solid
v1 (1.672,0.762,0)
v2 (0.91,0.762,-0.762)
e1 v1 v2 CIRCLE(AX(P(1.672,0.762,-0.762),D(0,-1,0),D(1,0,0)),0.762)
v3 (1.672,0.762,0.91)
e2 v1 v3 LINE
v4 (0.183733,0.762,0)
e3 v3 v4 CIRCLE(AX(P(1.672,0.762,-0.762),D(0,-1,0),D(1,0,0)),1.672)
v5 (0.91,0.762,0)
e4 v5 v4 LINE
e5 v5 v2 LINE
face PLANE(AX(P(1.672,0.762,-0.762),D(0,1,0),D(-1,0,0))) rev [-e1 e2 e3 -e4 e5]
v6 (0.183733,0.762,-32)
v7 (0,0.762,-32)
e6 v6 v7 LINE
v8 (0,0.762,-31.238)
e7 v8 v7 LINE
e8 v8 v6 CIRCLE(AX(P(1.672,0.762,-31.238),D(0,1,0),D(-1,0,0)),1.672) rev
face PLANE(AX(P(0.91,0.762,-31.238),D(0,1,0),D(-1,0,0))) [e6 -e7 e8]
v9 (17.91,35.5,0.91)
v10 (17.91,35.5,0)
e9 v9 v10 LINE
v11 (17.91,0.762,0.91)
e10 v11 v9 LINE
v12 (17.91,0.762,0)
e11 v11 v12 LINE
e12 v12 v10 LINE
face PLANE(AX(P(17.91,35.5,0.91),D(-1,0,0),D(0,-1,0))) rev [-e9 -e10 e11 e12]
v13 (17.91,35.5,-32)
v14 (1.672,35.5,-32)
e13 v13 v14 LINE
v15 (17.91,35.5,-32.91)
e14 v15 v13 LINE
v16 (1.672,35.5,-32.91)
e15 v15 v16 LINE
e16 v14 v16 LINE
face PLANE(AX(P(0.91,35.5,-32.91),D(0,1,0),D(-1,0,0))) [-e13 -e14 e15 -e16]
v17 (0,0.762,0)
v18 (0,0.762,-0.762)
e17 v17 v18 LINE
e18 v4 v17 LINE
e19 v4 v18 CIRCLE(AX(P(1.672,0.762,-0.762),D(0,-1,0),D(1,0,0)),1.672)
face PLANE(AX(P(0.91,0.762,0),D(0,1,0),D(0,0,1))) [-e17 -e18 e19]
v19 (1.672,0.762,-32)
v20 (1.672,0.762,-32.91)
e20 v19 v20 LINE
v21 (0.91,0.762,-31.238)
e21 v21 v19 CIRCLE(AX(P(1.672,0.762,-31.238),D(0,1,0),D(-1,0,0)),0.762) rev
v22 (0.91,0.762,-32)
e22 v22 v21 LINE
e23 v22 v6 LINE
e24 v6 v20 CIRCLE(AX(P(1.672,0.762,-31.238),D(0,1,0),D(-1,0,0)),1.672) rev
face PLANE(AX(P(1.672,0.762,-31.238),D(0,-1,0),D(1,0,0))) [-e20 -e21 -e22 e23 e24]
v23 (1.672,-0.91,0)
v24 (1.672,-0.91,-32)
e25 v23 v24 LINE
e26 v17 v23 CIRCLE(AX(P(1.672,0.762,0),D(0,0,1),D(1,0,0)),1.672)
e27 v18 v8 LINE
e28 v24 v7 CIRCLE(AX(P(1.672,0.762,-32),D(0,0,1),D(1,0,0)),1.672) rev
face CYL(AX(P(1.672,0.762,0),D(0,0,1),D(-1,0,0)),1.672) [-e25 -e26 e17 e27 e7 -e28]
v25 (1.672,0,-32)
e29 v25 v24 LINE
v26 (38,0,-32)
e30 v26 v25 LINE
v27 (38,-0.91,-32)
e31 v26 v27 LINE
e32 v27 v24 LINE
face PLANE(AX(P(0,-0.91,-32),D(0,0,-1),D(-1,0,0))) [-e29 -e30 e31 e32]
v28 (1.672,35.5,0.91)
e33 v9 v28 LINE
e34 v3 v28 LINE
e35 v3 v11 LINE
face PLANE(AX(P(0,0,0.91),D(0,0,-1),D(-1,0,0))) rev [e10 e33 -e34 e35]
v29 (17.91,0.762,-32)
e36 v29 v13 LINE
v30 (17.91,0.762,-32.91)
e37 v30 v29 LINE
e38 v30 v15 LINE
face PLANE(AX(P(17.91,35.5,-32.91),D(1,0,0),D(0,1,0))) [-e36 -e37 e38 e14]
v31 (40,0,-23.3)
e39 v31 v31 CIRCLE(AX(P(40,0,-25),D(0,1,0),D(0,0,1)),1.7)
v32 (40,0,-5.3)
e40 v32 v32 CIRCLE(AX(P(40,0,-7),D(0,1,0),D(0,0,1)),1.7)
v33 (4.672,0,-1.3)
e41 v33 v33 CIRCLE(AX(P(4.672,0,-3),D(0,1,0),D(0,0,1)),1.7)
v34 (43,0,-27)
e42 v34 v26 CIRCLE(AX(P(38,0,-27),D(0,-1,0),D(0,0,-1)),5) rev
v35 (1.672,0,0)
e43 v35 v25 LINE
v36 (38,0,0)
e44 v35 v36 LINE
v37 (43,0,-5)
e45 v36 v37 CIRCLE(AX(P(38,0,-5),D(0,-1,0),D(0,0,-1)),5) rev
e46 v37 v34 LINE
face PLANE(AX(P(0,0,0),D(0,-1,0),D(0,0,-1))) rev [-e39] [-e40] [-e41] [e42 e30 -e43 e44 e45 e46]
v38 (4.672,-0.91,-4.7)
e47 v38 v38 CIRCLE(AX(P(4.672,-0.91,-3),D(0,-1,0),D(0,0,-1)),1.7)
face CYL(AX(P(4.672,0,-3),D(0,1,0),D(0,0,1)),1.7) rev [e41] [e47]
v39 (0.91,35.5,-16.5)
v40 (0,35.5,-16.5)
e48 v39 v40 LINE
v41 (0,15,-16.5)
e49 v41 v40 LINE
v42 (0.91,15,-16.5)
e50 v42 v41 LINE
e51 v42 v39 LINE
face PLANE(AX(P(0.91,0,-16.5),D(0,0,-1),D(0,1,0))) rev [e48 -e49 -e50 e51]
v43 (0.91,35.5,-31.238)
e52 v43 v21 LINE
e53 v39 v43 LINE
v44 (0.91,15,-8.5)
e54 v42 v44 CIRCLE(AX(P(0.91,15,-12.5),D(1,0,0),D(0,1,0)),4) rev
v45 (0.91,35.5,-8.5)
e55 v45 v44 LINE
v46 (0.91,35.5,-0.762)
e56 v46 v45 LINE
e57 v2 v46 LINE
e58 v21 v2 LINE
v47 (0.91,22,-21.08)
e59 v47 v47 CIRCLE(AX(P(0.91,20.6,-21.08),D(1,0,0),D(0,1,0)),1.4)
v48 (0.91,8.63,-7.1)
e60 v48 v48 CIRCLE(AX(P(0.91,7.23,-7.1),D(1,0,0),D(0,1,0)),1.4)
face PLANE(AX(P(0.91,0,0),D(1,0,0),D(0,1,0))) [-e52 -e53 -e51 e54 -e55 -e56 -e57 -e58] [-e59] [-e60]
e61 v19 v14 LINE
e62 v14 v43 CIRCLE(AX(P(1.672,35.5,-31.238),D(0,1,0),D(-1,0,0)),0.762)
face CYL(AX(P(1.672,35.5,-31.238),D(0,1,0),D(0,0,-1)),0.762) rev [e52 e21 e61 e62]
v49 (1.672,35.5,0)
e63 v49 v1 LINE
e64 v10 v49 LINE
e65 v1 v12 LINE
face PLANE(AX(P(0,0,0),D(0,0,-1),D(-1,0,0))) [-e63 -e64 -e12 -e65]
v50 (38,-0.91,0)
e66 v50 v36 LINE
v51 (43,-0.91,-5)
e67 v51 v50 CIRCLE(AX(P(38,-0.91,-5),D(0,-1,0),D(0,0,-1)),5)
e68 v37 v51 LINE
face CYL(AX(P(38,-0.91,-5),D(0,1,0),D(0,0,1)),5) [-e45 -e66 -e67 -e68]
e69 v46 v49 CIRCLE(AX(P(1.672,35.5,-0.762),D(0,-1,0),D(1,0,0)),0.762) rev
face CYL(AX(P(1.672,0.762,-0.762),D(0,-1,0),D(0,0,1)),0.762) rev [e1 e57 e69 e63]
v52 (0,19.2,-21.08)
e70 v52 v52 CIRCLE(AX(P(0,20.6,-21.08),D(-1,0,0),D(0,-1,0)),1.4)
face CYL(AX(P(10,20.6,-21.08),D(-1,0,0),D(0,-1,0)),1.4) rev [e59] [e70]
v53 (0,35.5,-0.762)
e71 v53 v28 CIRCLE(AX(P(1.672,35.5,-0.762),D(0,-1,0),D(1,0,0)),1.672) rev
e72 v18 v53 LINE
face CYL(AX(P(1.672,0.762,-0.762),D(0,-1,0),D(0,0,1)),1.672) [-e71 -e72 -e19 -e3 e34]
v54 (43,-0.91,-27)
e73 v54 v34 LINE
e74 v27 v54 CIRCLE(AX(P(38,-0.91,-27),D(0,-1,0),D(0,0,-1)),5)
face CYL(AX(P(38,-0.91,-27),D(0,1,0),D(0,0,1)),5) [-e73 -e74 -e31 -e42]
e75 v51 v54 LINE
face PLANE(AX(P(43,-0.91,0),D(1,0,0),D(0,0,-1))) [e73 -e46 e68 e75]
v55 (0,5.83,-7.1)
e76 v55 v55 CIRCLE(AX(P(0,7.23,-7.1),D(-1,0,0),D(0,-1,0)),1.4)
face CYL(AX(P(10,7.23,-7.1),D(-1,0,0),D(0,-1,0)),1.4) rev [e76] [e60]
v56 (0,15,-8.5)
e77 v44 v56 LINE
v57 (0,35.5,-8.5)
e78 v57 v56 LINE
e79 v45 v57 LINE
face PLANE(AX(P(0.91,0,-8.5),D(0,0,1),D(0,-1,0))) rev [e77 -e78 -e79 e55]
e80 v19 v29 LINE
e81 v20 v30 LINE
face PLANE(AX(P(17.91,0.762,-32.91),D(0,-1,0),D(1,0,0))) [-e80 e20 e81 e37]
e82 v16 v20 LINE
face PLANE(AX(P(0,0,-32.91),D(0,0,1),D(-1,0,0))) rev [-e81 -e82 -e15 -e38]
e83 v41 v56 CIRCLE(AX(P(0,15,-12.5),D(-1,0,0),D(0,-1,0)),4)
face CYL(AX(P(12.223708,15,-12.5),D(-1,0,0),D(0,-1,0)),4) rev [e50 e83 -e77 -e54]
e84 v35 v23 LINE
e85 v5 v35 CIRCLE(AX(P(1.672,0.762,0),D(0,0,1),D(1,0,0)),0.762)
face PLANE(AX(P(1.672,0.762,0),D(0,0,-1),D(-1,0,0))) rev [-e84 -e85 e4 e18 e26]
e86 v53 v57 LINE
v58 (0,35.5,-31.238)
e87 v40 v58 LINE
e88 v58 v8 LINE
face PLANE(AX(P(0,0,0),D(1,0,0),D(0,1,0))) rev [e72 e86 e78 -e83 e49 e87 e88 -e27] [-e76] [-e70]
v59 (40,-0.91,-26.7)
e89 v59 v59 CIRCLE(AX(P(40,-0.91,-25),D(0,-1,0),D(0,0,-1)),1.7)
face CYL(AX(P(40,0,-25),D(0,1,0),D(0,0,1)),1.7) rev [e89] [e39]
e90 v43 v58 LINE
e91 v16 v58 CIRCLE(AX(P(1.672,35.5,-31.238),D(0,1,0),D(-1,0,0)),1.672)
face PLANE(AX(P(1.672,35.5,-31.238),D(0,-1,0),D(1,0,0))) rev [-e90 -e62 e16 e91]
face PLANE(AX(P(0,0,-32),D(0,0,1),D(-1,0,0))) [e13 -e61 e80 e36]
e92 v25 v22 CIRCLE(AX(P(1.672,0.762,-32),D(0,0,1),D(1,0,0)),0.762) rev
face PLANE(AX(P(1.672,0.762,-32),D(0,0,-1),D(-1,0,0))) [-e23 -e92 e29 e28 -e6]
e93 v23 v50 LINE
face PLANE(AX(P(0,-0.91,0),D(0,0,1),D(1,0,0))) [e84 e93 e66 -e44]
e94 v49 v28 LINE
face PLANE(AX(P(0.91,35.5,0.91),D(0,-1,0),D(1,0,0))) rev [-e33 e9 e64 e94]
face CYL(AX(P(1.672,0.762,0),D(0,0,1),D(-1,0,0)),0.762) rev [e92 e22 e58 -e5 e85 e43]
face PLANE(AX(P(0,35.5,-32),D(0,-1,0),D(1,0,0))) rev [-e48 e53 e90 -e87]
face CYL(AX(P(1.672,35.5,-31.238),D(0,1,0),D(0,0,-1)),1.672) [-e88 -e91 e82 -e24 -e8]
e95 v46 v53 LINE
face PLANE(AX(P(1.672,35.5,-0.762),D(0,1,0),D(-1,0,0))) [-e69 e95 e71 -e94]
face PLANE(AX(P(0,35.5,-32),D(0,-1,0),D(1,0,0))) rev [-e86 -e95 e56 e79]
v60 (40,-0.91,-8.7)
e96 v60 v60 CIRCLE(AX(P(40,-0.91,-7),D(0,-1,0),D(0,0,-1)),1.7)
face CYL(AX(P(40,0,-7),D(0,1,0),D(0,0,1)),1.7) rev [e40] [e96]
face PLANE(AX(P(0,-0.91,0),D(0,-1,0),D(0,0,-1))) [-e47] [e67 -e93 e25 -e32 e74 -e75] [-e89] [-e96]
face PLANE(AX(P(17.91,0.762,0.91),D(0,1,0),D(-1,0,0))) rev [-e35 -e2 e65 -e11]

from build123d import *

# Parameters (mm, degrees)
SKETCH1_W                    = 43
SKETCH1_H                    = 32
BASE_FLANGE1_DEPTH           = 0.91
EDGE_FLANGE1_STRIP_W         = 5.164
EDGE_FLANGE1_STRIP_H         = 0.91
EDGE_FLANGE1_STRIP_CUT_DEPTH = 32
EDGE_FLANGE1_DEPTH           = 32
EDGE_FLANGE2_STRIP_W         = 5.164
EDGE_FLANGE2_STRIP_H         = 0.91
EDGE_FLANGE2_STRIP_CUT_DEPTH = 34.738
EDGE_FLANGE2_DEPTH           = 34.738
SKETCH9_R                    = 4
MOTOR_HOLES_DEPTH            = 0.91
M3_CLEARANCE_HOLE3_D         = 3.4
M3_CLEARANCE_HOLE3_DEPTH     = 12
M3_CLEARANCE_HOLE3_TIP       = 1.021463052
SKETCH31_W                   = 8
SKETCH31_H                   = 20.5
CUT_EXTRUDE3_DEPTH           = 10
FILLET2_R                    = 5
SKETCH34_R                   = 1.4
CUT_EXTRUDE4_DEPTH           = 10
SKETCH35_R                   = 1.4
CUT_EXTRUDE5_DEPTH           = 10


# Sheet-metal steps are written as plain solids
with BuildPart() as part:
    # Sketch1 → Base-Flange1 (new body)
    with BuildSketch(Plane(origin=(0, 0, 0), x_dir=(1, 0, 0), z_dir=(0, 1, 0))):
        with Locations((21.5, 16)):
            Rectangle(SKETCH1_W, SKETCH1_H)
    extrude(amount=-BASE_FLANGE1_DEPTH)

    # Edge-Flange1 strip (across the edge) → Edge-Flange1 strip cut (cut)
    with BuildSketch(Plane.XY.offset(-32)):
        with Locations((-0.91, -0.455)):
            Rectangle(EDGE_FLANGE1_STRIP_W, EDGE_FLANGE1_STRIP_H)
    extrude(amount=EDGE_FLANGE1_STRIP_CUT_DEPTH, mode=Mode.SUBTRACT)

    # Edge-Flange1 section (across the edge) → Edge-Flange1 (add)
    with BuildSketch(Plane.XY.offset(-32)):
        with BuildLine():
            Line((0, 0.762), (0, 35.5))
            Line((0, 35.5), (0.91, 35.5))
            Line((0.91, 35.5), (0.91, 0.762))
            ThreePointArc((0.91, 0.762), (1.133184633, 0.223184633), (1.672, 0))
            Line((1.672, 0), (1.672, -0.91))
            ThreePointArc((1.672, -0.91), (0.489717462, -0.420282538), (0, 0.762))
        make_face()
    extrude(amount=EDGE_FLANGE1_DEPTH)

    # Edge-Flange2 strip (across the edge) → Edge-Flange2 strip cut (cut)
    with BuildSketch(Plane(origin=(0.91, 35.5, 0), x_dir=(0, 0, -1), z_dir=(0, -1, 0))):
        with Locations((-1.82, -0.455)):
            Rectangle(EDGE_FLANGE2_STRIP_W, EDGE_FLANGE2_STRIP_H)
    edge_flange2_strip_cut = extrude(amount=EDGE_FLANGE2_STRIP_CUT_DEPTH, mode=Mode.SUBTRACT)

    # Edge-Flange2 section (across the edge) → Edge-Flange2 (add)
    with BuildSketch(Plane(origin=(0.91, 35.5, 0), x_dir=(0, 0, -1), z_dir=(0, -1, 0))):
        with BuildLine():
            Line((-0.91, 0.762), (-0.91, 17))
            Line((-0.91, 17), (0, 17))
            Line((0, 17), (0, 0.762))
            ThreePointArc((0, 0.762), (0.223184633, 0.223184633), (0.762, 0))
            Line((0.762, 0), (0.762, -0.91))
            ThreePointArc((0.762, -0.91), (-0.420282538, -0.420282538), (-0.91, 0.762))
        make_face()
    edge_flange2 = extrude(amount=EDGE_FLANGE2_DEPTH)

    # Sketch9 → Motor Holes (cut)
    with BuildSketch(Plane.ZY):
        with Locations(Location((-12.5, 15, 0), (0, 0, 270))):
            Circle(SKETCH9_R)
    extrude(amount=-MOTOR_HOLES_DEPTH, mode=Mode.SUBTRACT)

    # Mirror4: Edge-Flange2 strip cut, Edge-Flange2 across plane
    add(edge_flange2_strip_cut.mirror(Plane(origin=(0, 0, -16), x_dir=(1, 0, 0), z_dir=(0, 0, -1))), mode=Mode.SUBTRACT)
    add(edge_flange2.mirror(Plane(origin=(0, 0, -16), x_dir=(1, 0, 0), z_dir=(0, 0, -1))))

    # M3 Clearance Hole3
    with Locations(Plane(origin=(0, 0, 0), x_dir=(1, 0, 0), z_dir=(0, 1, 0))):
        with Locations((40, 7), (4.672, 3), (40, 25)):
            Hole(M3_CLEARANCE_HOLE3_D / 2, depth=M3_CLEARANCE_HOLE3_DEPTH)
            with Locations((0, 0, -(M3_CLEARANCE_HOLE3_DEPTH + M3_CLEARANCE_HOLE3_TIP / 2))):  # 118° drill point
                Cone(0, M3_CLEARANCE_HOLE3_D / 2, M3_CLEARANCE_HOLE3_TIP, mode=Mode.SUBTRACT)

    # Sketch31 → Cut-Extrude3 (cut)
    with BuildSketch(Plane.ZY):
        with Locations((-12.5, 25.25)):
            Rectangle(SKETCH31_W, SKETCH31_H)
    extrude(amount=-CUT_EXTRUDE3_DEPTH, mode=Mode.SUBTRACT)

    # Fillet2
    fillet2_edges = [part.edges().sort_by_distance(p)[0] for p in [
        (43, -0.455, -32),
        (43, -0.455, 0),
    ]]
    fillet(fillet2_edges, radius=FILLET2_R)

    # Sketch34 → Cut-Extrude4 (cut)
    with BuildSketch(Plane.ZY):
        with Locations(Location((-7.1, 7.23, 0), (0, 0, 270))):
            Circle(SKETCH34_R)
    extrude(amount=-CUT_EXTRUDE4_DEPTH, mode=Mode.SUBTRACT)

    # Sketch35 → Cut-Extrude5 (cut)
    with BuildSketch(Plane.ZY):
        with Locations(Location((-21.08, 20.6, 0), (0, 0, 270))):
            Circle(SKETCH35_R)
    extrude(amount=-CUT_EXTRUDE5_DEPTH, mode=Mode.SUBTRACT)


solid = part.part
